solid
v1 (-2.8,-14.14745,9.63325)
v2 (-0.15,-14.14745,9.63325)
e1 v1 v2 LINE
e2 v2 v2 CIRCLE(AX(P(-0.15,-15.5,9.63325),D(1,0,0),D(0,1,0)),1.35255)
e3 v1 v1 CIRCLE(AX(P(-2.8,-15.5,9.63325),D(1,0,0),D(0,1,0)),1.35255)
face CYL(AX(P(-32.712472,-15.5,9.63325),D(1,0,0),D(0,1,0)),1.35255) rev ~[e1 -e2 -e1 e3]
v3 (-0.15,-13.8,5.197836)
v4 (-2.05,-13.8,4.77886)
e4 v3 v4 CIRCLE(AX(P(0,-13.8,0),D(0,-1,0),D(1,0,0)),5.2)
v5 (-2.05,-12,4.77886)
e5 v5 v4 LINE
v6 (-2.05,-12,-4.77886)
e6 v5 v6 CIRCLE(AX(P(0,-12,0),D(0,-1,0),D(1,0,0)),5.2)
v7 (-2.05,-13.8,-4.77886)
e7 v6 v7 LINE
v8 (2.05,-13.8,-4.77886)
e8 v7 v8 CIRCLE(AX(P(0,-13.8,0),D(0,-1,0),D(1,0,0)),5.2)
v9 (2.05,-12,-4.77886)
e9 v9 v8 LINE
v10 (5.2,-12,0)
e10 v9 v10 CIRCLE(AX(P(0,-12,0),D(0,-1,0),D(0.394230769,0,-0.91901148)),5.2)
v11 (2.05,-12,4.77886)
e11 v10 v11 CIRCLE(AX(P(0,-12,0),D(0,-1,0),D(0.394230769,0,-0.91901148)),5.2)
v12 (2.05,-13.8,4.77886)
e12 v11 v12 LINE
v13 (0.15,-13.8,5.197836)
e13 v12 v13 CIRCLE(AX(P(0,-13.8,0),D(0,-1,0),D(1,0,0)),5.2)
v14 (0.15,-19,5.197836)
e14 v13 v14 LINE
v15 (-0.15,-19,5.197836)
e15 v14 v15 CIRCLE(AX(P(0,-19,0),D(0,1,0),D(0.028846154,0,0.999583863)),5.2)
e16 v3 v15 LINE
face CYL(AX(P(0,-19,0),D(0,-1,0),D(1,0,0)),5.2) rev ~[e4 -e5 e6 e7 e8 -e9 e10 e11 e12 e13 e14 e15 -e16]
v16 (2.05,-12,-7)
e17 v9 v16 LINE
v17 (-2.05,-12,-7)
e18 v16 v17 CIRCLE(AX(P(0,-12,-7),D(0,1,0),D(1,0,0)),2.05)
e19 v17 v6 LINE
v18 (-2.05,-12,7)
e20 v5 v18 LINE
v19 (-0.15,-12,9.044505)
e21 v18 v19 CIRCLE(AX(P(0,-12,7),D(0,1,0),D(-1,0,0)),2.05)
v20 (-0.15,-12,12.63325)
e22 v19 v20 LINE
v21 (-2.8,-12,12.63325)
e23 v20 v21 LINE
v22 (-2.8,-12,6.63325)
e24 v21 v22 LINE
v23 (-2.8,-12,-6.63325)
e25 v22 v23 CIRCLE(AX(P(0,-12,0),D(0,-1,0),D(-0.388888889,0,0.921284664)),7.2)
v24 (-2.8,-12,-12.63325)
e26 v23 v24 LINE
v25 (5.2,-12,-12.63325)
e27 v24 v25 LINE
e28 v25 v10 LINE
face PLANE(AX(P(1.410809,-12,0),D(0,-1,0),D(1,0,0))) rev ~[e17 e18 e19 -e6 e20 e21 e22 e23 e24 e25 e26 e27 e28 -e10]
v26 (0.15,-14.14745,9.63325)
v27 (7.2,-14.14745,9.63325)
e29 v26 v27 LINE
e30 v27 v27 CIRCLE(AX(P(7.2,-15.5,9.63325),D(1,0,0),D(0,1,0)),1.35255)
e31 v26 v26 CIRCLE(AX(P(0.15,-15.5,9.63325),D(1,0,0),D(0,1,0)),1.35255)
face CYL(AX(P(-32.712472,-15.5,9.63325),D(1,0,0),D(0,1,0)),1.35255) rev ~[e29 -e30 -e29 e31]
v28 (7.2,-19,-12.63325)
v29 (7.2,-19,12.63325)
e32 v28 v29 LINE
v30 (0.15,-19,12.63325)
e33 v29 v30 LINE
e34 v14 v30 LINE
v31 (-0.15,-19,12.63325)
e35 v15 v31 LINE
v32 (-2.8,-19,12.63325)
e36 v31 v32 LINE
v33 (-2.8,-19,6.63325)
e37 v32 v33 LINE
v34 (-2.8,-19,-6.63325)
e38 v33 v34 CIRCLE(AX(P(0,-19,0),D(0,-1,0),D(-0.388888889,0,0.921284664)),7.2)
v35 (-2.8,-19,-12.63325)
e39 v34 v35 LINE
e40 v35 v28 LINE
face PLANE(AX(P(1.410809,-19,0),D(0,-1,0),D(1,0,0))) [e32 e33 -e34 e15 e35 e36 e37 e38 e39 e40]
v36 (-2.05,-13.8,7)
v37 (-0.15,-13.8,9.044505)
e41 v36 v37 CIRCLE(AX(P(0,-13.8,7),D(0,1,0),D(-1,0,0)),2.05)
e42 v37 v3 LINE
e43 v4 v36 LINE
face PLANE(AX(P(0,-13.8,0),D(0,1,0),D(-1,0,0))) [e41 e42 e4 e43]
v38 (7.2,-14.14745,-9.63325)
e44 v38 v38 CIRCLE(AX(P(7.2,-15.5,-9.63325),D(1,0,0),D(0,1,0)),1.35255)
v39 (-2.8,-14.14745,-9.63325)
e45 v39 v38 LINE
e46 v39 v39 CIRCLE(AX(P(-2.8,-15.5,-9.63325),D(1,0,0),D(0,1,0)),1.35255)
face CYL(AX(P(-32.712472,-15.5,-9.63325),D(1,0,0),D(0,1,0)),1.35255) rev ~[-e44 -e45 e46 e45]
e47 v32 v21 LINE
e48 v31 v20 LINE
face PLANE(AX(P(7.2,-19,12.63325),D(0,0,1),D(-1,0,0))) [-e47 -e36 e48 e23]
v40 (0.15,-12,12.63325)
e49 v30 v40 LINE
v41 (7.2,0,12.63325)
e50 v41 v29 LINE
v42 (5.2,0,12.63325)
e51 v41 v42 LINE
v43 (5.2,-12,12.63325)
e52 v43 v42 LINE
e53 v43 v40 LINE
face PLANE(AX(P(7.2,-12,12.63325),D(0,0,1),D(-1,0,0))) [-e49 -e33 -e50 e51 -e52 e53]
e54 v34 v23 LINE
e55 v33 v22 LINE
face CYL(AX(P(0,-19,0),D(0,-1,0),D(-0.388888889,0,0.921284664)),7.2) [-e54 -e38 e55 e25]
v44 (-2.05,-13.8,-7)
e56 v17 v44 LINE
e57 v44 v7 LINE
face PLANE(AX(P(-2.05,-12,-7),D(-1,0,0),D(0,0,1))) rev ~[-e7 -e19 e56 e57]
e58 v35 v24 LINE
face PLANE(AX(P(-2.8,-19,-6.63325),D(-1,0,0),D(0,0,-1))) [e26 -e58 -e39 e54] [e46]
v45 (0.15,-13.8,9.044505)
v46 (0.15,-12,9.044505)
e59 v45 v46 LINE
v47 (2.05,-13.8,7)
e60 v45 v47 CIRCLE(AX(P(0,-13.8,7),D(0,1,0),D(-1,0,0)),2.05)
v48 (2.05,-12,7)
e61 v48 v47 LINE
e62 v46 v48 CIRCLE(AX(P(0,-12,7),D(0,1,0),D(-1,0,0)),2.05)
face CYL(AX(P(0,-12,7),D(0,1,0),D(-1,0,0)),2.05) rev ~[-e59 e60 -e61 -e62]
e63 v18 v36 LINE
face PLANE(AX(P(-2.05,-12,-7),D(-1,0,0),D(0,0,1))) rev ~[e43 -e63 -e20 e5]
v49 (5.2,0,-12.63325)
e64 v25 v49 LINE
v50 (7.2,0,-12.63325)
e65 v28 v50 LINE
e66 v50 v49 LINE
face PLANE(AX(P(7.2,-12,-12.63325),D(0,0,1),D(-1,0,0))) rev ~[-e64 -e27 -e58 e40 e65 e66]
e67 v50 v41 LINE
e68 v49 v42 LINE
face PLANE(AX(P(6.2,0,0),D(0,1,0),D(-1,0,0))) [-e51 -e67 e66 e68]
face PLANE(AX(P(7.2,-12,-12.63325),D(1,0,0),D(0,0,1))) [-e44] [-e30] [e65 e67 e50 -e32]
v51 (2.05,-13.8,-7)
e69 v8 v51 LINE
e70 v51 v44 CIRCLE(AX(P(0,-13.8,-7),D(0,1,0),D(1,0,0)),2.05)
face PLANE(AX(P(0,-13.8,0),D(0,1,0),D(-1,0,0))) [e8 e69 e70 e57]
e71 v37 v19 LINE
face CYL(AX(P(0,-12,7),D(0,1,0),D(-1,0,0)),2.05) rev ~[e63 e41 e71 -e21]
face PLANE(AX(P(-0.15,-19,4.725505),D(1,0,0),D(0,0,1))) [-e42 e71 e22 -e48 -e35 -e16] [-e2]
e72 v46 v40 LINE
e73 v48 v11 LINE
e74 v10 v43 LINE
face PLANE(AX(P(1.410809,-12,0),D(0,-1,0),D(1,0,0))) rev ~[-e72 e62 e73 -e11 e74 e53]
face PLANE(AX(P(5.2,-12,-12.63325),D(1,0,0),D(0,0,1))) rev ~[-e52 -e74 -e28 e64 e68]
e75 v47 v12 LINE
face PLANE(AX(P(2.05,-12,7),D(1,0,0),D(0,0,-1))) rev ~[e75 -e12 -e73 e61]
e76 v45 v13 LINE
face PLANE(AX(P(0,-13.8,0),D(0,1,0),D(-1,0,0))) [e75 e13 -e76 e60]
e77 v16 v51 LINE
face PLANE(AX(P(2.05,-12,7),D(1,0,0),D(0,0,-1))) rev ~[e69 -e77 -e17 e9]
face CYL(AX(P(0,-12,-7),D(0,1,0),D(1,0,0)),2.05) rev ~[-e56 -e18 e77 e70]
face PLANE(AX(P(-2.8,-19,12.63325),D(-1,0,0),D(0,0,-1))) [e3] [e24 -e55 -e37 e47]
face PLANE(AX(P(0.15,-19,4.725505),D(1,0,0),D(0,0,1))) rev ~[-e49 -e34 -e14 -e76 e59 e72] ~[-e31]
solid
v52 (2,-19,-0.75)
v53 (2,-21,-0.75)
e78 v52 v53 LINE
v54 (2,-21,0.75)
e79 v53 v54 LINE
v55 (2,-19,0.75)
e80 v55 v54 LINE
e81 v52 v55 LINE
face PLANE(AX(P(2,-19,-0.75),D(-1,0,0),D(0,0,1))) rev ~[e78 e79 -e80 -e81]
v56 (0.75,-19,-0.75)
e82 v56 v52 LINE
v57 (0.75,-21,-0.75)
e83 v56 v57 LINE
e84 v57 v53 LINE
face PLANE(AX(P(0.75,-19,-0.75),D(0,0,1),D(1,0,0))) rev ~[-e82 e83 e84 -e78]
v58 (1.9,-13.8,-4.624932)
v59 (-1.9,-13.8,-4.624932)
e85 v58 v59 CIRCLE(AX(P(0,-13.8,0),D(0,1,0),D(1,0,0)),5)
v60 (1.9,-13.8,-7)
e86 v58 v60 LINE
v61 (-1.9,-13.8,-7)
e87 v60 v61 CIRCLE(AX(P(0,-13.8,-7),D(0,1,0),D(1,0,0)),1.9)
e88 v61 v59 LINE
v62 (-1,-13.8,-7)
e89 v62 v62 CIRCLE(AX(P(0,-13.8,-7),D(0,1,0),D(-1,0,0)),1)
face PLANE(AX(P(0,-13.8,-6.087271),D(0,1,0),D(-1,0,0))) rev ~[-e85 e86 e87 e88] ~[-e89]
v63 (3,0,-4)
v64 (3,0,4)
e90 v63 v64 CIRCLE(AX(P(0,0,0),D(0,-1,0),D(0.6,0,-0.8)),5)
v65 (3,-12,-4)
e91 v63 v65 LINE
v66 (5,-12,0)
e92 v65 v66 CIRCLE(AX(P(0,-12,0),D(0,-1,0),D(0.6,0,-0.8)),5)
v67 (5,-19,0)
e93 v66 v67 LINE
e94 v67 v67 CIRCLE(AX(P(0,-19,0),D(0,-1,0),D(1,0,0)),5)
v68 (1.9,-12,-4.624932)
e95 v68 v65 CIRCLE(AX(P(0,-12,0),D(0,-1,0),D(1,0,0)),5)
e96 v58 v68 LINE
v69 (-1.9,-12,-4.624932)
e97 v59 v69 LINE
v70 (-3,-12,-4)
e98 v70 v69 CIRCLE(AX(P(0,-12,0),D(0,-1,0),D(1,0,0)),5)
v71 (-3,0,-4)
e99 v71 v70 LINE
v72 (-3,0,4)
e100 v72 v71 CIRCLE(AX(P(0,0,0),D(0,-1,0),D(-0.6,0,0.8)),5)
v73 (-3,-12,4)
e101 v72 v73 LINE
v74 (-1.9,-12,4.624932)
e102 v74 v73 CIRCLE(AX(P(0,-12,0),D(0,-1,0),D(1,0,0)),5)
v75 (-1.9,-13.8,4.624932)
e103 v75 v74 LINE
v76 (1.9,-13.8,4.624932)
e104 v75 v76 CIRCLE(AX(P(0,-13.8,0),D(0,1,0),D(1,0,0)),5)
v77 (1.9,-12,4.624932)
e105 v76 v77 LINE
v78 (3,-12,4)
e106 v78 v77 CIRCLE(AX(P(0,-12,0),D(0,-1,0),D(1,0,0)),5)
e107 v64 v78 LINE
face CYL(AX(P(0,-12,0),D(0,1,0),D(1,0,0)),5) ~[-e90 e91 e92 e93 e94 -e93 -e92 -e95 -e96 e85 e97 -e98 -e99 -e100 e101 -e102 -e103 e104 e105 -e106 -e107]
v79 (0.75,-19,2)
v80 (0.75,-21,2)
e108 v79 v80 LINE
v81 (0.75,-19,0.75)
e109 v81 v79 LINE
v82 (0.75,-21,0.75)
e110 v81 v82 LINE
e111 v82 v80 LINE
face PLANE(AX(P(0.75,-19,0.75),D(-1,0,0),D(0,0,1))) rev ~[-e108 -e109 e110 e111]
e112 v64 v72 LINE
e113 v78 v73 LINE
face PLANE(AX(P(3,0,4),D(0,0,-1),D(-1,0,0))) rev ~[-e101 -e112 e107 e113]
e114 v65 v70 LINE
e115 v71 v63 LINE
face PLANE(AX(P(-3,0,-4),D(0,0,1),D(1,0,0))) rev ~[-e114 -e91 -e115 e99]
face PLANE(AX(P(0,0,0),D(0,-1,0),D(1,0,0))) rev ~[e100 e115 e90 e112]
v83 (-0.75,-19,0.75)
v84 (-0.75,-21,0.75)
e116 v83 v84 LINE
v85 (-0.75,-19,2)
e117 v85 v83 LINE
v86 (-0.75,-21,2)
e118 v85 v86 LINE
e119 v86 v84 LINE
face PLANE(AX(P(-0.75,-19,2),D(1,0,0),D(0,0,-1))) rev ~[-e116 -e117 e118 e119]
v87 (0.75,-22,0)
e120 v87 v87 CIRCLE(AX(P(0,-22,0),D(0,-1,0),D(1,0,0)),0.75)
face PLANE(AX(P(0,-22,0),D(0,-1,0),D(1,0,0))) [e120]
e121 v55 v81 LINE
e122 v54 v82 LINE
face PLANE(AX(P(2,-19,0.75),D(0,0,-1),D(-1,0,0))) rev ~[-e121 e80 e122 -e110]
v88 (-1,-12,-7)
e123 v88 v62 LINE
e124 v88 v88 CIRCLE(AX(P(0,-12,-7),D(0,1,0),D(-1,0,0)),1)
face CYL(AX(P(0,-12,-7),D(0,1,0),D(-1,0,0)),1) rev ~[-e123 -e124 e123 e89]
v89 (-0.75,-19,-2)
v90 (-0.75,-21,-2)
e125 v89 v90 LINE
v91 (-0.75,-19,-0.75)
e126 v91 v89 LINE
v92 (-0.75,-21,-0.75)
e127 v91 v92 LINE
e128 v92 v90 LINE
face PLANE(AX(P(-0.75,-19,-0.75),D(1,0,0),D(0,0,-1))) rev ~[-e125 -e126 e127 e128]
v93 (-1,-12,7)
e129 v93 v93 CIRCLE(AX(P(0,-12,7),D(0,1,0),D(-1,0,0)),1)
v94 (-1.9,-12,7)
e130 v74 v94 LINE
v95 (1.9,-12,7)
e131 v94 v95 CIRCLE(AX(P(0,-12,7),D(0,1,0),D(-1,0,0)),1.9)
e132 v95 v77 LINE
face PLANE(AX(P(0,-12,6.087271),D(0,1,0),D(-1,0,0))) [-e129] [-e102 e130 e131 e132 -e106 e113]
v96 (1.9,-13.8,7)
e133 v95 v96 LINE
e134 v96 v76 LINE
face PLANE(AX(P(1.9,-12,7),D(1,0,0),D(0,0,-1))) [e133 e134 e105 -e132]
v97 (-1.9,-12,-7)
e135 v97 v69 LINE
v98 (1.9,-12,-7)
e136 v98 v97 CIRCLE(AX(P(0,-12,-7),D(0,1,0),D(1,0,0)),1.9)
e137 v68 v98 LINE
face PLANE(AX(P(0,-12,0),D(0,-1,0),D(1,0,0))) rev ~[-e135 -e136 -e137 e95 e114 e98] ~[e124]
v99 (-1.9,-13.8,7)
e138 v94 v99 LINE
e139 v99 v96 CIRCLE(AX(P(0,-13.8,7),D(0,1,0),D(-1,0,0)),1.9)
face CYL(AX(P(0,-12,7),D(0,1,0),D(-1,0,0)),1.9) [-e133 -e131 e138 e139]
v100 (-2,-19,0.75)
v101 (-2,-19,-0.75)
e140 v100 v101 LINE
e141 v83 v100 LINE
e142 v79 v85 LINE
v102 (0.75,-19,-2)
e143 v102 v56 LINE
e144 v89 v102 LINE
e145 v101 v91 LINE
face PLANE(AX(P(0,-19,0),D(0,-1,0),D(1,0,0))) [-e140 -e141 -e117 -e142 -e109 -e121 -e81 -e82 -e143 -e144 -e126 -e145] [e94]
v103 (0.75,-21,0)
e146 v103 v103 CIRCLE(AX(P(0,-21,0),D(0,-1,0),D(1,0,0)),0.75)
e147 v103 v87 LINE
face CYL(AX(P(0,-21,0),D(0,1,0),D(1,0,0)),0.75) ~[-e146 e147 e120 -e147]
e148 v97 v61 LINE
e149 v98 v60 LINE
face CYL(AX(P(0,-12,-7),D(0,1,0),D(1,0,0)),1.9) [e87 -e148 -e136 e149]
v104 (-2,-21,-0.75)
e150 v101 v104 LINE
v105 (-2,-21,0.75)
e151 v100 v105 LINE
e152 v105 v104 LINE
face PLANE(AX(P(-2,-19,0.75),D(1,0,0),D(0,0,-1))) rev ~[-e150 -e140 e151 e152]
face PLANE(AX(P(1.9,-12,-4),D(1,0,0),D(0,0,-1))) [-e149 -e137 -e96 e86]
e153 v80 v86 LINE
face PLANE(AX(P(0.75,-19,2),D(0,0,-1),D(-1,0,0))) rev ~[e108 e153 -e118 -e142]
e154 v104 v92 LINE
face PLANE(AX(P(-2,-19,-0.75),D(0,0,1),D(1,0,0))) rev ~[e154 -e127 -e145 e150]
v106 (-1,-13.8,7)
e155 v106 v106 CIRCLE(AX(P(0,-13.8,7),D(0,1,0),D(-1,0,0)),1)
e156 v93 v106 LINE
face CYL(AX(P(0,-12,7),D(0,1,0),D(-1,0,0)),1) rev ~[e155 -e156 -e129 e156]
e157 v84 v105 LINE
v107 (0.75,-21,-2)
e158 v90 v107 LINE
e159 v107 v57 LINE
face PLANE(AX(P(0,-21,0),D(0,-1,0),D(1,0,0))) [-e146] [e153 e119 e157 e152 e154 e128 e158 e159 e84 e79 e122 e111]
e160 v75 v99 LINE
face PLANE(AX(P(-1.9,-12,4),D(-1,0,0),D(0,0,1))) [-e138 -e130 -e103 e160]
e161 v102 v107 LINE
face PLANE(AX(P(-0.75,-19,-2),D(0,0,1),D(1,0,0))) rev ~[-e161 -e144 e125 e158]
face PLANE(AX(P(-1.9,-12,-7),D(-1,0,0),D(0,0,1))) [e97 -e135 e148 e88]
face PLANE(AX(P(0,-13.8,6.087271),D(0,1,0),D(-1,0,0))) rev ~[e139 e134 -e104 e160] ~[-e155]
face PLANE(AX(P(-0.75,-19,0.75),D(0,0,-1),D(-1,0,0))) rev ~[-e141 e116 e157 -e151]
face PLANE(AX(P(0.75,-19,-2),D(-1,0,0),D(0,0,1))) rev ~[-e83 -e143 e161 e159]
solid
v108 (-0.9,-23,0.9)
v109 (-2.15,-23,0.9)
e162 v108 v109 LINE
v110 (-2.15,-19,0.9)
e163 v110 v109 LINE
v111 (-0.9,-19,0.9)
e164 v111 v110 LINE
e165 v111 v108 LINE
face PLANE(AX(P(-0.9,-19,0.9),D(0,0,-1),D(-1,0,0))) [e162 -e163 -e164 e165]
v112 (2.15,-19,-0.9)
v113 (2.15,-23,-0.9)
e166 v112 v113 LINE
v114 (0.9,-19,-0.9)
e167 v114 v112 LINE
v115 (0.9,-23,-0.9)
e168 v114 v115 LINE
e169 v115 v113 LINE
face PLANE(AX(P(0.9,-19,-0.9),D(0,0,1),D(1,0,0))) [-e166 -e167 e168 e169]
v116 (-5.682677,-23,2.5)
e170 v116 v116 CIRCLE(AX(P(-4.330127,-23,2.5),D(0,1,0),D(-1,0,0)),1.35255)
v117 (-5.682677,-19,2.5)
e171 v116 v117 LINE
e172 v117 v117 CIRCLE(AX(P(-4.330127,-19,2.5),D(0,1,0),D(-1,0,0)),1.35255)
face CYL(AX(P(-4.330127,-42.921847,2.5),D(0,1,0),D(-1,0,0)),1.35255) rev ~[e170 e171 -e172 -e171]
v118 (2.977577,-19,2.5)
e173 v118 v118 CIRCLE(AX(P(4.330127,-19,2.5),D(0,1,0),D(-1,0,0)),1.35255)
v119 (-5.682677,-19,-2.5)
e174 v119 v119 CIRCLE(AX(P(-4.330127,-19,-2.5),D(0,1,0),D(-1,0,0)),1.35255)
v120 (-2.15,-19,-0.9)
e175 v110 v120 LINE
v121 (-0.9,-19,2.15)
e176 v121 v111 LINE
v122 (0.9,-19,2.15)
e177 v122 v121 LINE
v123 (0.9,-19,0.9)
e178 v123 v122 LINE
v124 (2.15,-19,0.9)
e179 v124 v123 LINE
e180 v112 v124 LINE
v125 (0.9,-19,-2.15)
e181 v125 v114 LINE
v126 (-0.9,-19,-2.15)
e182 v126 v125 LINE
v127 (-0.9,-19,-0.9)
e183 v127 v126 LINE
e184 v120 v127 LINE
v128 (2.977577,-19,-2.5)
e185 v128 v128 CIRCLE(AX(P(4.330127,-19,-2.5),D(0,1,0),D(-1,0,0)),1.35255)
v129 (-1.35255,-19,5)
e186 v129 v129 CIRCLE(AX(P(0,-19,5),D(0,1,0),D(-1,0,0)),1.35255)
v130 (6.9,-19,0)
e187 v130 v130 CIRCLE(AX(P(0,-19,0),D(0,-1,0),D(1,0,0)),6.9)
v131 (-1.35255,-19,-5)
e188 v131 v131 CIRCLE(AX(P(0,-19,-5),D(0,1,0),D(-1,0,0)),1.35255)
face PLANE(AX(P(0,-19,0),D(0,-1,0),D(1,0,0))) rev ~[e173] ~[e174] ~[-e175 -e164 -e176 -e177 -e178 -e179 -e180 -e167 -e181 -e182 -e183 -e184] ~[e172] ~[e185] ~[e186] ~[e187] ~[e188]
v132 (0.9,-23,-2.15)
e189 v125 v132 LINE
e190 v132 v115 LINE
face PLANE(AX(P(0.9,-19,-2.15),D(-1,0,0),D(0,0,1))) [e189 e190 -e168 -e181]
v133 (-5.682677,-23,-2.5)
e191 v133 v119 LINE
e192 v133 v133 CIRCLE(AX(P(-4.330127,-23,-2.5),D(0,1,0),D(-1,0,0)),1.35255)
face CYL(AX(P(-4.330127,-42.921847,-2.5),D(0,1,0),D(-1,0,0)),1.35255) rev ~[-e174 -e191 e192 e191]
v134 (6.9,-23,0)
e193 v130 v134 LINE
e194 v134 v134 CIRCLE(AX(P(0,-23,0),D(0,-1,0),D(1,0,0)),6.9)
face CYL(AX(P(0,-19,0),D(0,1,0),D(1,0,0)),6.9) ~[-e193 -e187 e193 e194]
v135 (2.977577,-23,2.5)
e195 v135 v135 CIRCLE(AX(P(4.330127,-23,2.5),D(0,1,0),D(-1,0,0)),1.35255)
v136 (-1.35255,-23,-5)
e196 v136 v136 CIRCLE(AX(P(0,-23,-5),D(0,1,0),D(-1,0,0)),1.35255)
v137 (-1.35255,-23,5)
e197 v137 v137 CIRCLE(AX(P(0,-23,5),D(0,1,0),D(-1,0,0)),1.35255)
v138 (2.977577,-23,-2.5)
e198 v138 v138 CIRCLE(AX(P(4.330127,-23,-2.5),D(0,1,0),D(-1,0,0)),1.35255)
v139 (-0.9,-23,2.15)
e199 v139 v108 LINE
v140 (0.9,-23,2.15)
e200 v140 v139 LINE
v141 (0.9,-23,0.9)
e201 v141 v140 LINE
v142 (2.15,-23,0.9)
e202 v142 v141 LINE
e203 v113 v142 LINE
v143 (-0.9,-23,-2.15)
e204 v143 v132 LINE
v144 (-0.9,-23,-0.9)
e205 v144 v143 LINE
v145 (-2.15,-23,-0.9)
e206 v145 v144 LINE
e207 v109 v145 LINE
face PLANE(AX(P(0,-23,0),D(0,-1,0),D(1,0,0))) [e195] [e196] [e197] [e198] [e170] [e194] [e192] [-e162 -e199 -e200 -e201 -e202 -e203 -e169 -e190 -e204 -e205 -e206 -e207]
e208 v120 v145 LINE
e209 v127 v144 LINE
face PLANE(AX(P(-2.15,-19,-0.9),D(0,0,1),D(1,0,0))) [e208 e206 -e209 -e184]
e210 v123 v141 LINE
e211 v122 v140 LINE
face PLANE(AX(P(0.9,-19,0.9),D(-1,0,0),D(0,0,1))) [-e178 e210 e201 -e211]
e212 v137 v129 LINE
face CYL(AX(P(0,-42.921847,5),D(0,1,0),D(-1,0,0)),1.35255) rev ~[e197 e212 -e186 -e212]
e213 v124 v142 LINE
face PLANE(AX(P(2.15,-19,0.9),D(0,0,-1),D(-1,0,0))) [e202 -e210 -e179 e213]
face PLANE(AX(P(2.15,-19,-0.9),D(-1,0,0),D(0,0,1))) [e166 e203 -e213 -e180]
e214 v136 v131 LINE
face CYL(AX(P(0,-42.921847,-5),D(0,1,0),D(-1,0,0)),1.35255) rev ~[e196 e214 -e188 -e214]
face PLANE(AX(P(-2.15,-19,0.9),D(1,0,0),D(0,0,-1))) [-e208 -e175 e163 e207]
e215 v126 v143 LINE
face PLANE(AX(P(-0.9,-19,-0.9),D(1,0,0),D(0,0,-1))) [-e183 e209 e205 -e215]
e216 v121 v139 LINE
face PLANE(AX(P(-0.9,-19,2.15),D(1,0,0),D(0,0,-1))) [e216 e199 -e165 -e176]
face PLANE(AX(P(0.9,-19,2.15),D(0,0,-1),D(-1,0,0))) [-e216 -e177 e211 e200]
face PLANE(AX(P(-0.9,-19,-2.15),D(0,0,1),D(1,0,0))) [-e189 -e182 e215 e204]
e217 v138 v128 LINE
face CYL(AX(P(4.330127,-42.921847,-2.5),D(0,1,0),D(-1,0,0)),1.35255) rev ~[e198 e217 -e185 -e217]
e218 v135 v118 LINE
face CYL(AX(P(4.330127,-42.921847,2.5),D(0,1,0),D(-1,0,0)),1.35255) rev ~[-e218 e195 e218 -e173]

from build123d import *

# Parameters (mm, degrees)
F1_DEPTH  = 12
F2_R      = 5
F3_DEPTH  = 7
F5_DEPTH  = 2
F6_R      = 0.75
F7_DEPTH  = 1
F8_R      = 1
F9_DEPTH  = 1.8
F12_R     = 5.2
F13_DEPTH = 7
F15_DEPTH = 1.8
F17_D     = 2.7051
F18_W     = 0.3
F18_H     = 8.3822393163
F19_DEPTH = 7
F20_W     = 2
F20_H     = 25.2664991614
F21_DEPTH = 12
F23_R     = 6.9
F24_DEPTH = 4
F25_DEPTH = 4
F27_D     = 2.7051


with BuildPart() as f1:
    # F0 (on Front) → F1 (new body)
    with BuildSketch(Plane.XZ):
        with BuildLine():
            Line((3, 4), (-3, 4))
            ThreePointArc((-3, 4), (-5, 0), (-3, -4))
            Line((-3, -4), (3, -4))
            ThreePointArc((3, -4), (5, 0), (3, 4))
        make_face()
    extrude(amount=F1_DEPTH)

    # F2 (on face) → F3 (join)
    with BuildSketch(Plane.XZ.offset(12)):
        Circle(F2_R)
    extrude(amount=F3_DEPTH)

    # F4 (on face) → F5 (join)
    with BuildSketch(Plane.XZ.offset(19)):
        Polygon((0.75, 2), (-0.75, 2), (-0.75, 0.75), (-2, 0.75), (-2, -0.75), (-0.75, -0.75), (-0.75, -2), (0.75, -2), (0.75, -0.75), (2, -0.75), (2, 0.75), (0.75, 0.75), align=None)
    extrude(amount=F5_DEPTH)

    # F6 (on face) → F7 (join)
    with BuildSketch(Plane.XZ.offset(21)):
        Circle(F6_R)
    extrude(amount=F7_DEPTH)

    # F8 (on face) → F9 (join)
    with BuildSketch(Plane(origin=(0, -12, 0), x_dir=(-1, 0, 0), z_dir=(0, 1, 0))):
        with BuildLine():
            Line((-1.9, 7), (-1.9, 4))
            Line((-1.9, 4), (1.9, 4))
            Line((1.9, 4), (1.9, 7))
            ThreePointArc((1.9, 7), (0, 8.9), (-1.9, 7))
        make_face()
        with Locations((0, 7)):
            Circle(F8_R, mode=Mode.SUBTRACT)
        with BuildLine():
            Line((1.9, -4), (-1.9, -4))
            Line((-1.9, -4), (-1.9, -7))
            ThreePointArc((-1.9, -7), (0, -8.9), (1.9, -7))
            Line((1.9, -7), (1.9, -4))
        make_face()
        with Locations((0, -7)):
            Circle(F8_R, mode=Mode.SUBTRACT)
    extrude(amount=-F9_DEPTH)


with BuildPart() as f10_1:
    # F10: copy of F1
    add(f1.part)


with BuildPart() as f13:
    # F12 (on face) → F13 (new body, through all)
    with BuildSketch(Plane.XZ.offset(19)):
        with BuildLine():
            Line((7.2, -12.6332495807), (7.2, 0))
            Line((7.2, 0), (7.2, 12.6332495807))
            Line((7.2, 12.6332495807), (-2.8, 12.6332495807))
            Line((-2.8, 12.6332495807), (-2.8, 6.6332495807))
            ThreePointArc((-2.8, 6.6332495807), (-7.2, 0), (-2.8, -6.6332495807))
            Line((-2.8, -6.6332495807), (-2.8, -12.6332495807))
            Line((-2.8, -12.6332495807), (7.2, -12.6332495807))
        make_face()
        Circle(F12_R, mode=Mode.SUBTRACT)
    extrude(amount=-F13_DEPTH)

    # F14 (on face) → F15 (cut, through all)
    with BuildSketch(Plane(origin=(0, -12, 0), x_dir=(-1, 0, 0), z_dir=(0, 1, 0))):
        with BuildLine():
            Line((-2.05, 4.6249324319), (-2.05, -7))
            ThreePointArc((-2.05, -7), (0, -9.05), (2.05, -7))
            Line((2.05, -7), (2.05, 4.6541262418))
            Line((2.05, 4.6541262418), (2.05, 4.7788596966))
            Line((2.05, 4.7788596966), (2.05, 7))
            ThreePointArc((2.05, 7), (0, 9.05), (-2.05, 7))
            Line((-2.05, 7), (-2.05, 4.7788596966))
            Line((-2.05, 4.7788596966), (-2.05, 4.6249324319))
        make_face()
    extrude(amount=-F15_DEPTH, mode=Mode.SUBTRACT)

    # F17 (through all)
    with Locations(Plane(origin=(-2.8, 0, 0), x_dir=(0, -1, 0), z_dir=(-1, 0, 0))):
        with Locations((15.5, -9.6332495807), (15.5, 9.6332495807)):
            Hole(F17_D / 2)

    # F18 (on face) → F19 (cut, through all)
    with BuildSketch(Plane.XZ.offset(19)):
        with Locations((0, 8.9166247904)):
            Rectangle(F18_W, F18_H)
    extrude(amount=-F19_DEPTH, mode=Mode.SUBTRACT)

    # F20 (on face) → F21 (join, through all)
    with BuildSketch(Plane(origin=(0, -12, 0), x_dir=(-1, 0, 0), z_dir=(0, 1, 0))):
        with Locations((-6.2, 0)):
            Rectangle(F20_W, F20_H)
    extrude(amount=F21_DEPTH)


with BuildPart() as f24:
    # F23 (on face) → F24 (new body)
    with BuildSketch(Plane.XZ.offset(19)):
        Circle(F23_R)
    extrude(amount=F24_DEPTH)

    # F22 (on face) → F25 (cut, through all)
    with BuildSketch(Plane.XZ.offset(19)):
        Polygon((-0.9, 0.9), (-2.15, 0.9), (-2.15, -0.9), (-0.9, -0.9), (-0.9, -2.15), (0.9, -2.15), (0.9, -0.9), (2.15, -0.9), (2.15, 0.9), (0.9, 0.9), (0.9, 2.15), (-0.9, 2.15), align=None)
    extrude(amount=F25_DEPTH, mode=Mode.SUBTRACT)

    # F27 (through all)
    with Locations(Plane.XZ.offset(23)):
        with Locations((-4.3301270189, -2.5), (-4.3301270189, 2.5), (0, 5), (4.3301270189, 2.5), (4.3301270189, -2.5), (0, -5)):
            Hole(F27_D / 2)


solid = Compound([f1.part, f13.part, f24.part])
